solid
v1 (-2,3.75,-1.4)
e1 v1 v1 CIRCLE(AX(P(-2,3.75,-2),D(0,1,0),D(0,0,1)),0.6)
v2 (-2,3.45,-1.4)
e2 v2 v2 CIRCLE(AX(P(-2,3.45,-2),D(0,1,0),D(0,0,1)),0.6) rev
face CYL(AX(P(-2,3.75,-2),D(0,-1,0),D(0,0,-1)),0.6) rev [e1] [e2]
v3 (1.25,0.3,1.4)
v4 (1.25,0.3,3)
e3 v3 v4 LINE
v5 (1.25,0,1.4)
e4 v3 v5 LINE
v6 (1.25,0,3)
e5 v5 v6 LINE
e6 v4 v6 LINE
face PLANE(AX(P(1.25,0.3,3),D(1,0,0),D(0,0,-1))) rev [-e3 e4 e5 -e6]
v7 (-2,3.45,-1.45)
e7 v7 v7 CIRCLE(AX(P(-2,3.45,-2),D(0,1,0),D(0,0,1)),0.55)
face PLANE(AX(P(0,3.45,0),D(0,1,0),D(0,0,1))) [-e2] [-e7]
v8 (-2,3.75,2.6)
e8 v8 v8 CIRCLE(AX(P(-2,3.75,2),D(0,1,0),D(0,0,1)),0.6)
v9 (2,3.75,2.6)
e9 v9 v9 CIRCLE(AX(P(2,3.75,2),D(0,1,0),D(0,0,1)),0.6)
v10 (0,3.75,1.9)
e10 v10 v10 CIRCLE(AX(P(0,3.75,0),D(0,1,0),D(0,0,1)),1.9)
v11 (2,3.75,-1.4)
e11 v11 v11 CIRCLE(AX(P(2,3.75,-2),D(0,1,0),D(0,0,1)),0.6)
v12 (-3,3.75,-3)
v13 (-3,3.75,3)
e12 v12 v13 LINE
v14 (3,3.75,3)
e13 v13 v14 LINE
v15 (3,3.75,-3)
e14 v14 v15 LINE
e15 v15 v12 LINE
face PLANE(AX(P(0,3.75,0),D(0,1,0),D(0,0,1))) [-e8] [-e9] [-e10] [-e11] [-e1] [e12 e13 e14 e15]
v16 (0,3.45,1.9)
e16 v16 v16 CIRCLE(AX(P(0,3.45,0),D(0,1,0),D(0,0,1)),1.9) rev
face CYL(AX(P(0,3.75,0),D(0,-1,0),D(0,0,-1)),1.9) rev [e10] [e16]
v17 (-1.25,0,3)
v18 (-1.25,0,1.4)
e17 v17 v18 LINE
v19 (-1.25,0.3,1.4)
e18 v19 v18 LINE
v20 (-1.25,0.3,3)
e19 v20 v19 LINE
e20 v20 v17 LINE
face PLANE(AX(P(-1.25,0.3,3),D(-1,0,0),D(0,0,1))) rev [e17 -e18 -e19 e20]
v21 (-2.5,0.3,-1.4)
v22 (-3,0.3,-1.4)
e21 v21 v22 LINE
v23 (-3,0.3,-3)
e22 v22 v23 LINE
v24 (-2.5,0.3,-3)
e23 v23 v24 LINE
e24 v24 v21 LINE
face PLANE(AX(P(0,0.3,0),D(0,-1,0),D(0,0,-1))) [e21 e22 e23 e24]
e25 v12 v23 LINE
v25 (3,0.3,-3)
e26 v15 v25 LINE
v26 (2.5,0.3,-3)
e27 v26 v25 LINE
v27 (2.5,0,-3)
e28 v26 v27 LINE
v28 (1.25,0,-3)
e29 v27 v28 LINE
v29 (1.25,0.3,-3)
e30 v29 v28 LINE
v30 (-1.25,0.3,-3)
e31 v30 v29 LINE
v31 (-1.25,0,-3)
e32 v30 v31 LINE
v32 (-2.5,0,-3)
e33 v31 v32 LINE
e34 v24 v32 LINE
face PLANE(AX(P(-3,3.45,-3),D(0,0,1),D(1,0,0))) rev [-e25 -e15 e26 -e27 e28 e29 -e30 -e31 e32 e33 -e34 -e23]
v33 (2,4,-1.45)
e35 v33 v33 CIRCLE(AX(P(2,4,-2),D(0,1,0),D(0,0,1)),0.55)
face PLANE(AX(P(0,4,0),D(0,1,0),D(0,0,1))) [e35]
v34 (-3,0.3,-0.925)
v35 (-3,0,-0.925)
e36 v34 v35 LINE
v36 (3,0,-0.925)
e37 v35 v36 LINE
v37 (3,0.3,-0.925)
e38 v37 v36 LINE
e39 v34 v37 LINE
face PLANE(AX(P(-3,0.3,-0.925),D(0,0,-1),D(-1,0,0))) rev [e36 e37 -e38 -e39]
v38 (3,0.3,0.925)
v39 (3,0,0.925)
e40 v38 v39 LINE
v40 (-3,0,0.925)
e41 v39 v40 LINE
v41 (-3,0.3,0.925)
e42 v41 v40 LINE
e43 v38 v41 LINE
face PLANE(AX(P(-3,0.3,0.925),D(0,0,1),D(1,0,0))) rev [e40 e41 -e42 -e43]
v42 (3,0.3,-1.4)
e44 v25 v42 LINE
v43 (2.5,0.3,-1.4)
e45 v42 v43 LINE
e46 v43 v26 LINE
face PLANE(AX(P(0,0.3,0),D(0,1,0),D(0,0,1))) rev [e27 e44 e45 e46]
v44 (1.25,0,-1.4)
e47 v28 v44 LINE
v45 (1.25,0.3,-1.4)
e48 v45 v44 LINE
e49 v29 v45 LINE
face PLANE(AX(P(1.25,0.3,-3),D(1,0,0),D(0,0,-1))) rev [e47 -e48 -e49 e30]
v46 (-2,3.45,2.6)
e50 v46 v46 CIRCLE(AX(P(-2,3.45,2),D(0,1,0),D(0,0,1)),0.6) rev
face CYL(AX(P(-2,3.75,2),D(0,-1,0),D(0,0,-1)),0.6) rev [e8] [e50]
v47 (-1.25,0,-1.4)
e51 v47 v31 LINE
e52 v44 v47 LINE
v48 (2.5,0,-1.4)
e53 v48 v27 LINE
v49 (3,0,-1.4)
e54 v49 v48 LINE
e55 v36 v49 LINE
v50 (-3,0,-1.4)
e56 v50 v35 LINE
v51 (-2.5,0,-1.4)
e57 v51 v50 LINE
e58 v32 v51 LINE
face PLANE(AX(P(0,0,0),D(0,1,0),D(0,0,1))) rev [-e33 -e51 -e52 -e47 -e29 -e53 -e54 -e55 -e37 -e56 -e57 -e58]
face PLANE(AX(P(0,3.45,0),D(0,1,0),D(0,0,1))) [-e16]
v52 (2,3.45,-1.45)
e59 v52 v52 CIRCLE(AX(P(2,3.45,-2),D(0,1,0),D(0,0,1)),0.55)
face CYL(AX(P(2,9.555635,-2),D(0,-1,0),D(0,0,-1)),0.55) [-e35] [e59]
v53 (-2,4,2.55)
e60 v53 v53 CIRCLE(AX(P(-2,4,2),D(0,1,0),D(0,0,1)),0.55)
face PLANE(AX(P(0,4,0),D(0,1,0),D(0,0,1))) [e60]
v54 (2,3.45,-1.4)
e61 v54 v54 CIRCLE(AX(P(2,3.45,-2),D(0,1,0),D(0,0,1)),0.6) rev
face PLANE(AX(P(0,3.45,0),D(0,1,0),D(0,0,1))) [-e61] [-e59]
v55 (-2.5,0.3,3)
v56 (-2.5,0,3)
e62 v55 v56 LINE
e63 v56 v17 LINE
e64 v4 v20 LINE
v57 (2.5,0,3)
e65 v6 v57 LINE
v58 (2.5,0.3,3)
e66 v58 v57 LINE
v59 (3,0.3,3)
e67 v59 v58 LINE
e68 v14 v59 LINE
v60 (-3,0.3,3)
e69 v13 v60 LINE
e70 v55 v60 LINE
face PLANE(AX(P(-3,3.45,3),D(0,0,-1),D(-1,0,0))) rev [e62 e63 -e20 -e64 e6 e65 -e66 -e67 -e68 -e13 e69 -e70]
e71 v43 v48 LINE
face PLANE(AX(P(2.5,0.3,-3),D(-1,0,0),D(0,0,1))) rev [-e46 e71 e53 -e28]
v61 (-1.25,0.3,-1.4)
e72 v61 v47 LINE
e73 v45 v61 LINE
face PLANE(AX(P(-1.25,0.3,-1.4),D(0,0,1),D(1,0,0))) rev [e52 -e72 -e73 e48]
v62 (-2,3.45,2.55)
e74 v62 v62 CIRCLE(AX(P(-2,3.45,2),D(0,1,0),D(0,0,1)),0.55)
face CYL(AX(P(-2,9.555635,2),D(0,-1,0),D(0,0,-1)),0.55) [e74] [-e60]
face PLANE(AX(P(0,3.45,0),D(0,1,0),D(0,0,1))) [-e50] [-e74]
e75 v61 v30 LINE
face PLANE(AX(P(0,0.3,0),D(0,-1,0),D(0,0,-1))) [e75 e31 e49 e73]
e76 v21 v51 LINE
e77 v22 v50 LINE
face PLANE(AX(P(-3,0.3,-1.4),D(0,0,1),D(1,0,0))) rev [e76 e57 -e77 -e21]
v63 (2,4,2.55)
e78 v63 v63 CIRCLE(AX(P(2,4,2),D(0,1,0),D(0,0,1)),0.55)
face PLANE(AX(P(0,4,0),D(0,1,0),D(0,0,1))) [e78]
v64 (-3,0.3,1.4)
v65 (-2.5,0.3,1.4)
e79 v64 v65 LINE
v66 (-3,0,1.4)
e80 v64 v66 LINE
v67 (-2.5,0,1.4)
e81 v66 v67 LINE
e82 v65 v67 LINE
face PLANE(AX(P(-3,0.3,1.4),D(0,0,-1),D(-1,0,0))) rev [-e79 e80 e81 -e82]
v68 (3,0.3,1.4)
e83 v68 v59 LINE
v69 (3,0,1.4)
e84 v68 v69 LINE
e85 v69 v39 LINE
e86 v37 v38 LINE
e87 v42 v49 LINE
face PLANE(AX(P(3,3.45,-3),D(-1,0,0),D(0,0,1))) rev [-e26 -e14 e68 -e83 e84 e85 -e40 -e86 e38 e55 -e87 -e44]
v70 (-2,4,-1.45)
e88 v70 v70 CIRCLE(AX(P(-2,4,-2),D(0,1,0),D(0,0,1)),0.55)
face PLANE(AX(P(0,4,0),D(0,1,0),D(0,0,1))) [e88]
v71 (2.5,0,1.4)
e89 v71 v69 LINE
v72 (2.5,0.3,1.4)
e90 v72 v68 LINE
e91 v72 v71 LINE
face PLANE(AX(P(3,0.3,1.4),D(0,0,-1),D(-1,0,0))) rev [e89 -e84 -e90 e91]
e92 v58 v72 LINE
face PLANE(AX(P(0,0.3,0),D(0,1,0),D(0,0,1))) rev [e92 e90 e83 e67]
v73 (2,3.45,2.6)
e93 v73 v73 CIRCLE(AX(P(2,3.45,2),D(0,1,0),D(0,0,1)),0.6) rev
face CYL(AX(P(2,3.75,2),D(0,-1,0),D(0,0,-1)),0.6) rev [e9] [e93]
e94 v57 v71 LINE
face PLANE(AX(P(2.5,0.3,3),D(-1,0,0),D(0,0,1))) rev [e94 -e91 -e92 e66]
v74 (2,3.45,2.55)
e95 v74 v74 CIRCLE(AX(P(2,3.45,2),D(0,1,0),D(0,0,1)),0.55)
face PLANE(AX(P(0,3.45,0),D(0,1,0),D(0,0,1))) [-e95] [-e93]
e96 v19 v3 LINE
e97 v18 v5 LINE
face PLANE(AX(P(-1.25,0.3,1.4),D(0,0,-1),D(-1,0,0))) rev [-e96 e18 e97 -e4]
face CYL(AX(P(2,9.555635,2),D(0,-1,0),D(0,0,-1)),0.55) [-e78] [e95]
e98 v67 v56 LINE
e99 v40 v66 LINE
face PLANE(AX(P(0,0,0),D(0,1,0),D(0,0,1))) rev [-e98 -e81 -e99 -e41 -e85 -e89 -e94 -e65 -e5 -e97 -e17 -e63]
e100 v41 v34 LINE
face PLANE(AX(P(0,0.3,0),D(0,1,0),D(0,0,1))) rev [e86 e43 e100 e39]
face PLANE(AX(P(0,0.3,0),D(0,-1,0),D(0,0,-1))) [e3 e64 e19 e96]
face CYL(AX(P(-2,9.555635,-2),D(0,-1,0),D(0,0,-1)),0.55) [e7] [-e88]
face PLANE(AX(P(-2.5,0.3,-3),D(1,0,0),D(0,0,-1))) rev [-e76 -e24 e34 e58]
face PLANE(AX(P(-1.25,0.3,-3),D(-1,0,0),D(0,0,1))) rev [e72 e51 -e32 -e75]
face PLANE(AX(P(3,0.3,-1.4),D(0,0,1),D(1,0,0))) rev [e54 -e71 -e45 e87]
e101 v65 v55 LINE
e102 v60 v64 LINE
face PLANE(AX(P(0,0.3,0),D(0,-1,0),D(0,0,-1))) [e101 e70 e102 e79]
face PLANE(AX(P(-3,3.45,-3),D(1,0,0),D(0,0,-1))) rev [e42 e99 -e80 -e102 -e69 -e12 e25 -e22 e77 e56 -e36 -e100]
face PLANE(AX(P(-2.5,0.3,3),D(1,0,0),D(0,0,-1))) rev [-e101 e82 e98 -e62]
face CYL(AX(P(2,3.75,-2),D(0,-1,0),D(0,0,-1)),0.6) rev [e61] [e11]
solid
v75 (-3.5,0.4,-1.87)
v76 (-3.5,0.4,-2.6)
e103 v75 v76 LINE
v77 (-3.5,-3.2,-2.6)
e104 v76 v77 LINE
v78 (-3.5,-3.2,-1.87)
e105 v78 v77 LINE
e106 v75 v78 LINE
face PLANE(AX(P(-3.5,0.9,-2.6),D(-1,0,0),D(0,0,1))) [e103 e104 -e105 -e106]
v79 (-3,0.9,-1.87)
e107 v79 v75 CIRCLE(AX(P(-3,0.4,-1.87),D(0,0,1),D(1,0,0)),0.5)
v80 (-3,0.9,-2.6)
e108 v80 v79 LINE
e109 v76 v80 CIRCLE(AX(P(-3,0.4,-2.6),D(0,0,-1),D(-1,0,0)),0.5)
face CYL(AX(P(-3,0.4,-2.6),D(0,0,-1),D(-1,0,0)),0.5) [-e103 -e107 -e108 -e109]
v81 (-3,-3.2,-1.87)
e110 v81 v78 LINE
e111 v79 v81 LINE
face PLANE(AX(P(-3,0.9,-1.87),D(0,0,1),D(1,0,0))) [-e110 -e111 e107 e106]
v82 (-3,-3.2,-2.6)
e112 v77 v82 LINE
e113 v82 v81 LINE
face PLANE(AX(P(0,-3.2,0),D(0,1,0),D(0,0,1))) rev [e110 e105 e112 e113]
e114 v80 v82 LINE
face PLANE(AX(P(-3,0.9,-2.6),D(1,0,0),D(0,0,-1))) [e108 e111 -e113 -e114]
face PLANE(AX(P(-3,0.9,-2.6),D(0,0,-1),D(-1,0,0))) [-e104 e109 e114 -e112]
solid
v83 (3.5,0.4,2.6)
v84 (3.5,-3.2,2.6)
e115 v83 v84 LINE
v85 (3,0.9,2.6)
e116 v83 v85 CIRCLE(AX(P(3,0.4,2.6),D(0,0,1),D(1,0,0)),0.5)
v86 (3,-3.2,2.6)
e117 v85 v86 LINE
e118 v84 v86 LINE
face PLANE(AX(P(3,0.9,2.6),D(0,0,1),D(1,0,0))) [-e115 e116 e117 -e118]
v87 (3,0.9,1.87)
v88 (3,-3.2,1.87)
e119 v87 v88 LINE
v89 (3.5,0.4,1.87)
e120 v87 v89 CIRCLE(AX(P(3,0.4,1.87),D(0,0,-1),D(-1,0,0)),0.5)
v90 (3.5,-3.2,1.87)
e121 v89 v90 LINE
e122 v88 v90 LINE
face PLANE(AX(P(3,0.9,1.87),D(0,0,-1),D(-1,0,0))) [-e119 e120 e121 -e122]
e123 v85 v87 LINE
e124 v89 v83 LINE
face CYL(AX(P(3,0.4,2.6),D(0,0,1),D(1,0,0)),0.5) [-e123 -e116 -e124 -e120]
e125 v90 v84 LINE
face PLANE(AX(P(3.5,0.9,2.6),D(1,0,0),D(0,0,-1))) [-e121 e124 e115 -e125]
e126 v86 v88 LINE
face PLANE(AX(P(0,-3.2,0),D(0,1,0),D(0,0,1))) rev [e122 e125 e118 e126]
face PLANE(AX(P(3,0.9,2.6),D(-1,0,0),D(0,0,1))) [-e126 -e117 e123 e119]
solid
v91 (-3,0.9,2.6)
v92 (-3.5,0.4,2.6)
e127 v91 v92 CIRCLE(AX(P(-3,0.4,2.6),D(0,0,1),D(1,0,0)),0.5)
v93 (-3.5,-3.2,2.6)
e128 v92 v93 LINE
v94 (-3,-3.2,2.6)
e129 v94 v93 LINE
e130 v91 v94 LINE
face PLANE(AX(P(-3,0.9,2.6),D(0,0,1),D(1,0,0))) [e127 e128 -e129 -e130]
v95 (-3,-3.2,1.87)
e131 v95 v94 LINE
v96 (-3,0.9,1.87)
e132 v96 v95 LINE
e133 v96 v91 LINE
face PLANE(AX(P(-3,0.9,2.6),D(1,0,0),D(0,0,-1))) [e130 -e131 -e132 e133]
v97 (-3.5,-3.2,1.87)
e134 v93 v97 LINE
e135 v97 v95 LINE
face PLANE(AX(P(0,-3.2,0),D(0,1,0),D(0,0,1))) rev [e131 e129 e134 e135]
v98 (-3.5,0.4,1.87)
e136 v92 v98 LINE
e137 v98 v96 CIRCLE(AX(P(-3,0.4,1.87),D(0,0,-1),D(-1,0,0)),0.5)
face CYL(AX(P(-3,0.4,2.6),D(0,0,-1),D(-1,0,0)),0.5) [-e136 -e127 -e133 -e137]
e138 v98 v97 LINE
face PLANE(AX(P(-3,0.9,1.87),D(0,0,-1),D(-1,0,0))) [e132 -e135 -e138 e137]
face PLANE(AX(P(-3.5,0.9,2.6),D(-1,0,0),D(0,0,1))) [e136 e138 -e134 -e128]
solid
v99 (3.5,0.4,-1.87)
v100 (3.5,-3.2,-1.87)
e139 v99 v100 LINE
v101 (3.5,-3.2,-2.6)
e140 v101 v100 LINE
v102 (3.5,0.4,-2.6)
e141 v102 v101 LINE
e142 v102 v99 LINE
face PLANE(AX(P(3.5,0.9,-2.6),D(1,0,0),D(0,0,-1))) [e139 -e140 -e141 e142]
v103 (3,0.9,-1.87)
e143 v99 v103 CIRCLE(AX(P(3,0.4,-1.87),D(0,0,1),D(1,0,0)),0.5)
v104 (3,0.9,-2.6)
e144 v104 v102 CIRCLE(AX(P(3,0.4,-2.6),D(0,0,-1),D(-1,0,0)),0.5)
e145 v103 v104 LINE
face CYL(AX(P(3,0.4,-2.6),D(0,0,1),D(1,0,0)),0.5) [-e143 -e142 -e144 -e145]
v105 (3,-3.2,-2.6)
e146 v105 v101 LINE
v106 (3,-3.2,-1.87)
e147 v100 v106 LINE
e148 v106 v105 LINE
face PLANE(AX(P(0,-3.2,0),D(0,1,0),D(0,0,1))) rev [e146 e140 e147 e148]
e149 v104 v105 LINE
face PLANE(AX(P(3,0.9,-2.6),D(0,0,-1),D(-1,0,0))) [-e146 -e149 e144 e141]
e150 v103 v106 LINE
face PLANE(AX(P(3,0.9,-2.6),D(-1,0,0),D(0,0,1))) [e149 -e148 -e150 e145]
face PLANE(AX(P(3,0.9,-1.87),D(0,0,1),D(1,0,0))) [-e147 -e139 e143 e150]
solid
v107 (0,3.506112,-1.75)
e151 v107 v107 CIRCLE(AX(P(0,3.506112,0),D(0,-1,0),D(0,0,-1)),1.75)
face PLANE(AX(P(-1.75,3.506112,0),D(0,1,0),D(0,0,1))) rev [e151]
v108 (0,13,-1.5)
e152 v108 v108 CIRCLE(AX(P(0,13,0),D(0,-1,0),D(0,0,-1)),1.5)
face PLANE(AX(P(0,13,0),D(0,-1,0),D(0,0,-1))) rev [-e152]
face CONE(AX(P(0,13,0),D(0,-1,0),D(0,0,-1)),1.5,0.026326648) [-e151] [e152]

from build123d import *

# Parameters (mm, degrees)
SKETCH1_W                  = 6
SKETCH1_H                  = 6
BOSS_EXTRUDE1_DEPTH        = 3.45
SKETCH2_W                  = 6
SKETCH2_H                  = 6
SKETCH2_R                  = 0.6
SKETCH2_R_2                = 1.9
BOSS_EXTRUDE2_DEPTH        = 0.3
SKETCH3_R                  = 0.55
BOSS_EXTRUDE3_DEPTH        = 0.55
SKETCH5_W                  = 2.5
SKETCH5_H                  = 1.6
SKETCH5_W_2                = 6
SKETCH5_H_2                = 1.85
SKETCH5_W_3                = 0.5
CUT_EXTRUDE1_DEPTH         = 0.3
BOSS_EXTRUDE4_DEPTH        = 3.5
BOSS_EXTRUDE4_DEPTH_BACK   = 0.6
SKETCH6_W                  = 0.5
SKETCH6_H                  = 0.73
BOSS_EXTRUDE4_2_DEPTH      = 3.5
BOSS_EXTRUDE4_2_DEPTH_BACK = 0.6
BOSS_EXTRUDE4_3_DEPTH      = 3.5
BOSS_EXTRUDE4_3_DEPTH_BACK = 0.6
BOSS_EXTRUDE4_4_DEPTH      = 3.5
BOSS_EXTRUDE4_4_DEPTH_BACK = 0.6
FILLET1_R                  = 0.5
FILLET2_R                  = 0.5
FILLET3_R                  = 0.5
FILLET4_R                  = 0.5


with BuildPart() as part:
    # Sketch1 → Boss-Extrude1 (new body)
    with BuildSketch(Plane(origin=(0, 0, 0), x_dir=(1, 0, 0), z_dir=(0, 1, 0))):
        Rectangle(SKETCH1_W, SKETCH1_H)
    extrude(amount=BOSS_EXTRUDE1_DEPTH)



with BuildPart() as body_2:
    # Sketch2 → Boss-Extrude2 (new body)
    with BuildSketch(Plane(origin=(0, 3.45, 0), x_dir=(1, 0, 0), z_dir=(0, 1, 0))):
        Rectangle(SKETCH2_W, SKETCH2_H)
        with Locations(Location((-2, 2, 0), (0, 0, 270))):
            Circle(SKETCH2_R, mode=Mode.SUBTRACT)
        with Locations(Location((2, 2, 0), (0, 0, 270))):
            Circle(SKETCH2_R, mode=Mode.SUBTRACT)
        with Locations(Location((2, -2, 0), (0, 0, 270))):
            Circle(SKETCH2_R, mode=Mode.SUBTRACT)
        with Locations(Location((-2, -2, 0), (0, 0, 270))):
            Circle(SKETCH2_R, mode=Mode.SUBTRACT)
        with Locations(Location((0, 0, 0), (0, 0, 270))):
            Circle(SKETCH2_R_2, mode=Mode.SUBTRACT)
    extrude(amount=BOSS_EXTRUDE2_DEPTH)


with BuildPart() as part_1:
    add(part.part)

    add(body_2.part)  # Boss-Extrude3 merges body 2
    # Sketch3 → Boss-Extrude3 (add)
    with BuildSketch(Plane(origin=(0, 3.45, 0), x_dir=(1, 0, 0), z_dir=(0, 1, 0))):
        with Locations(Location((-2, 2, 0), (0, 0, 270))):
            Circle(SKETCH3_R)
        with Locations(Location((-2, -2, 0), (0, 0, 270))):
            Circle(SKETCH3_R)
        with Locations(Location((2, 2, 0), (0, 0, 270))):
            Circle(SKETCH3_R)
        with Locations(Location((2, -2, 0), (0, 0, 270))):
            Circle(SKETCH3_R)
    extrude(amount=BOSS_EXTRUDE3_DEPTH)

    # Sketch5 → Cut-Extrude1 (cut)
    with BuildSketch(Plane.XZ):
        with Locations((0, 2.2)):
            Rectangle(SKETCH5_W, SKETCH5_H)
        Rectangle(SKETCH5_W_2, SKETCH5_H_2)
        with Locations((-2.75, 2.2)):
            Rectangle(SKETCH5_W_3, SKETCH5_H)
        with Locations((2.75, 2.2)):
            Rectangle(SKETCH5_W_3, SKETCH5_H)
        with Locations((2.75, -2.2)):
            Rectangle(SKETCH5_W_3, SKETCH5_H)
        with Locations((-2.75, -2.2)):
            Rectangle(SKETCH5_W_3, SKETCH5_H)
        with Locations((0, -2.2)):
            Rectangle(SKETCH5_W, SKETCH5_H)
    extrude(amount=-CUT_EXTRUDE1_DEPTH, mode=Mode.SUBTRACT)


with BuildPart() as body_2_2:
    # Sketch4 → Revolve1 (revolve)
    with BuildSketch(Plane.XY, mode=Mode.PRIVATE) as revolve1_sk:
        Polygon((0, 13), (-1.5, 13), (-1.75, 3.506112458), (0, 3.506112458), align=None)
    revolve(revolve1_sk.sketch.rotate(Axis((0, 0, 0), (0, 1, 0)), 270), axis=Axis((0, 0, 0), (0, 1, 0)))


with BuildPart() as body_3:
    # Sketch6 → Boss-Extrude4 (new, two sides: drawn at the far end of the back side and taken through both)
    with BuildSketch(Plane.XZ.offset(-0.3).offset(-BOSS_EXTRUDE4_DEPTH_BACK)):
        with Locations((-3.25, 2.235)):
            Rectangle(SKETCH6_W, SKETCH6_H)
    extrude(amount=BOSS_EXTRUDE4_DEPTH + BOSS_EXTRUDE4_DEPTH_BACK)

    # Fillet1
    fillet1_edges = [body_3.edges().sort_by_distance(p)[0] for p in [
        (-3.5, 0.9, 2.235),
    ]]
    fillet(fillet1_edges, radius=FILLET1_R - 0.0001)  # a hair under: the kernel refuses the full size


with BuildPart() as body_4:
    # Sketch6 → Boss-Extrude4 2 (new, two sides: drawn at the far end of the back side and taken through both)
    with BuildSketch(Plane.XZ.offset(-0.3).offset(-BOSS_EXTRUDE4_2_DEPTH_BACK)):
        with Locations((3.25, 2.235)):
            Rectangle(SKETCH6_W, SKETCH6_H)
    extrude(amount=BOSS_EXTRUDE4_2_DEPTH + BOSS_EXTRUDE4_2_DEPTH_BACK)

    # Fillet3
    fillet3_edges = [body_4.edges().sort_by_distance(p)[0] for p in [
        (3.5, 0.9, 2.235),
    ]]
    fillet(fillet3_edges, radius=FILLET3_R - 0.0001)  # a hair under: the kernel refuses the full size


with BuildPart() as body_5:
    # Sketch6 → Boss-Extrude4 3 (new, two sides: drawn at the far end of the back side and taken through both)
    with BuildSketch(Plane.XZ.offset(-0.3).offset(-BOSS_EXTRUDE4_3_DEPTH_BACK)):
        with Locations((3.25, -2.235)):
            Rectangle(SKETCH6_W, SKETCH6_H)
    extrude(amount=BOSS_EXTRUDE4_3_DEPTH + BOSS_EXTRUDE4_3_DEPTH_BACK)

    # Fillet4
    fillet4_edges = [body_5.edges().sort_by_distance(p)[0] for p in [
        (3.5, 0.9, -2.235),
    ]]
    fillet(fillet4_edges, radius=FILLET4_R - 0.0001)  # a hair under: the kernel refuses the full size


with BuildPart() as body_6:
    # Sketch6 → Boss-Extrude4 4 (new, two sides: drawn at the far end of the back side and taken through both)
    with BuildSketch(Plane.XZ.offset(-0.3).offset(-BOSS_EXTRUDE4_4_DEPTH_BACK)):
        with Locations((-3.25, -2.235)):
            Rectangle(SKETCH6_W, SKETCH6_H)
    extrude(amount=BOSS_EXTRUDE4_4_DEPTH + BOSS_EXTRUDE4_4_DEPTH_BACK)

    # Fillet2
    fillet2_edges = [body_6.edges().sort_by_distance(p)[0] for p in [
        (-3.5, 0.9, -2.235),
    ]]
    fillet(fillet2_edges, radius=FILLET2_R - 0.0001)  # a hair under: the kernel refuses the full size


solid = Compound([part_1.part, body_2_2.part, body_3.part, body_4.part, body_5.part, body_6.part])
